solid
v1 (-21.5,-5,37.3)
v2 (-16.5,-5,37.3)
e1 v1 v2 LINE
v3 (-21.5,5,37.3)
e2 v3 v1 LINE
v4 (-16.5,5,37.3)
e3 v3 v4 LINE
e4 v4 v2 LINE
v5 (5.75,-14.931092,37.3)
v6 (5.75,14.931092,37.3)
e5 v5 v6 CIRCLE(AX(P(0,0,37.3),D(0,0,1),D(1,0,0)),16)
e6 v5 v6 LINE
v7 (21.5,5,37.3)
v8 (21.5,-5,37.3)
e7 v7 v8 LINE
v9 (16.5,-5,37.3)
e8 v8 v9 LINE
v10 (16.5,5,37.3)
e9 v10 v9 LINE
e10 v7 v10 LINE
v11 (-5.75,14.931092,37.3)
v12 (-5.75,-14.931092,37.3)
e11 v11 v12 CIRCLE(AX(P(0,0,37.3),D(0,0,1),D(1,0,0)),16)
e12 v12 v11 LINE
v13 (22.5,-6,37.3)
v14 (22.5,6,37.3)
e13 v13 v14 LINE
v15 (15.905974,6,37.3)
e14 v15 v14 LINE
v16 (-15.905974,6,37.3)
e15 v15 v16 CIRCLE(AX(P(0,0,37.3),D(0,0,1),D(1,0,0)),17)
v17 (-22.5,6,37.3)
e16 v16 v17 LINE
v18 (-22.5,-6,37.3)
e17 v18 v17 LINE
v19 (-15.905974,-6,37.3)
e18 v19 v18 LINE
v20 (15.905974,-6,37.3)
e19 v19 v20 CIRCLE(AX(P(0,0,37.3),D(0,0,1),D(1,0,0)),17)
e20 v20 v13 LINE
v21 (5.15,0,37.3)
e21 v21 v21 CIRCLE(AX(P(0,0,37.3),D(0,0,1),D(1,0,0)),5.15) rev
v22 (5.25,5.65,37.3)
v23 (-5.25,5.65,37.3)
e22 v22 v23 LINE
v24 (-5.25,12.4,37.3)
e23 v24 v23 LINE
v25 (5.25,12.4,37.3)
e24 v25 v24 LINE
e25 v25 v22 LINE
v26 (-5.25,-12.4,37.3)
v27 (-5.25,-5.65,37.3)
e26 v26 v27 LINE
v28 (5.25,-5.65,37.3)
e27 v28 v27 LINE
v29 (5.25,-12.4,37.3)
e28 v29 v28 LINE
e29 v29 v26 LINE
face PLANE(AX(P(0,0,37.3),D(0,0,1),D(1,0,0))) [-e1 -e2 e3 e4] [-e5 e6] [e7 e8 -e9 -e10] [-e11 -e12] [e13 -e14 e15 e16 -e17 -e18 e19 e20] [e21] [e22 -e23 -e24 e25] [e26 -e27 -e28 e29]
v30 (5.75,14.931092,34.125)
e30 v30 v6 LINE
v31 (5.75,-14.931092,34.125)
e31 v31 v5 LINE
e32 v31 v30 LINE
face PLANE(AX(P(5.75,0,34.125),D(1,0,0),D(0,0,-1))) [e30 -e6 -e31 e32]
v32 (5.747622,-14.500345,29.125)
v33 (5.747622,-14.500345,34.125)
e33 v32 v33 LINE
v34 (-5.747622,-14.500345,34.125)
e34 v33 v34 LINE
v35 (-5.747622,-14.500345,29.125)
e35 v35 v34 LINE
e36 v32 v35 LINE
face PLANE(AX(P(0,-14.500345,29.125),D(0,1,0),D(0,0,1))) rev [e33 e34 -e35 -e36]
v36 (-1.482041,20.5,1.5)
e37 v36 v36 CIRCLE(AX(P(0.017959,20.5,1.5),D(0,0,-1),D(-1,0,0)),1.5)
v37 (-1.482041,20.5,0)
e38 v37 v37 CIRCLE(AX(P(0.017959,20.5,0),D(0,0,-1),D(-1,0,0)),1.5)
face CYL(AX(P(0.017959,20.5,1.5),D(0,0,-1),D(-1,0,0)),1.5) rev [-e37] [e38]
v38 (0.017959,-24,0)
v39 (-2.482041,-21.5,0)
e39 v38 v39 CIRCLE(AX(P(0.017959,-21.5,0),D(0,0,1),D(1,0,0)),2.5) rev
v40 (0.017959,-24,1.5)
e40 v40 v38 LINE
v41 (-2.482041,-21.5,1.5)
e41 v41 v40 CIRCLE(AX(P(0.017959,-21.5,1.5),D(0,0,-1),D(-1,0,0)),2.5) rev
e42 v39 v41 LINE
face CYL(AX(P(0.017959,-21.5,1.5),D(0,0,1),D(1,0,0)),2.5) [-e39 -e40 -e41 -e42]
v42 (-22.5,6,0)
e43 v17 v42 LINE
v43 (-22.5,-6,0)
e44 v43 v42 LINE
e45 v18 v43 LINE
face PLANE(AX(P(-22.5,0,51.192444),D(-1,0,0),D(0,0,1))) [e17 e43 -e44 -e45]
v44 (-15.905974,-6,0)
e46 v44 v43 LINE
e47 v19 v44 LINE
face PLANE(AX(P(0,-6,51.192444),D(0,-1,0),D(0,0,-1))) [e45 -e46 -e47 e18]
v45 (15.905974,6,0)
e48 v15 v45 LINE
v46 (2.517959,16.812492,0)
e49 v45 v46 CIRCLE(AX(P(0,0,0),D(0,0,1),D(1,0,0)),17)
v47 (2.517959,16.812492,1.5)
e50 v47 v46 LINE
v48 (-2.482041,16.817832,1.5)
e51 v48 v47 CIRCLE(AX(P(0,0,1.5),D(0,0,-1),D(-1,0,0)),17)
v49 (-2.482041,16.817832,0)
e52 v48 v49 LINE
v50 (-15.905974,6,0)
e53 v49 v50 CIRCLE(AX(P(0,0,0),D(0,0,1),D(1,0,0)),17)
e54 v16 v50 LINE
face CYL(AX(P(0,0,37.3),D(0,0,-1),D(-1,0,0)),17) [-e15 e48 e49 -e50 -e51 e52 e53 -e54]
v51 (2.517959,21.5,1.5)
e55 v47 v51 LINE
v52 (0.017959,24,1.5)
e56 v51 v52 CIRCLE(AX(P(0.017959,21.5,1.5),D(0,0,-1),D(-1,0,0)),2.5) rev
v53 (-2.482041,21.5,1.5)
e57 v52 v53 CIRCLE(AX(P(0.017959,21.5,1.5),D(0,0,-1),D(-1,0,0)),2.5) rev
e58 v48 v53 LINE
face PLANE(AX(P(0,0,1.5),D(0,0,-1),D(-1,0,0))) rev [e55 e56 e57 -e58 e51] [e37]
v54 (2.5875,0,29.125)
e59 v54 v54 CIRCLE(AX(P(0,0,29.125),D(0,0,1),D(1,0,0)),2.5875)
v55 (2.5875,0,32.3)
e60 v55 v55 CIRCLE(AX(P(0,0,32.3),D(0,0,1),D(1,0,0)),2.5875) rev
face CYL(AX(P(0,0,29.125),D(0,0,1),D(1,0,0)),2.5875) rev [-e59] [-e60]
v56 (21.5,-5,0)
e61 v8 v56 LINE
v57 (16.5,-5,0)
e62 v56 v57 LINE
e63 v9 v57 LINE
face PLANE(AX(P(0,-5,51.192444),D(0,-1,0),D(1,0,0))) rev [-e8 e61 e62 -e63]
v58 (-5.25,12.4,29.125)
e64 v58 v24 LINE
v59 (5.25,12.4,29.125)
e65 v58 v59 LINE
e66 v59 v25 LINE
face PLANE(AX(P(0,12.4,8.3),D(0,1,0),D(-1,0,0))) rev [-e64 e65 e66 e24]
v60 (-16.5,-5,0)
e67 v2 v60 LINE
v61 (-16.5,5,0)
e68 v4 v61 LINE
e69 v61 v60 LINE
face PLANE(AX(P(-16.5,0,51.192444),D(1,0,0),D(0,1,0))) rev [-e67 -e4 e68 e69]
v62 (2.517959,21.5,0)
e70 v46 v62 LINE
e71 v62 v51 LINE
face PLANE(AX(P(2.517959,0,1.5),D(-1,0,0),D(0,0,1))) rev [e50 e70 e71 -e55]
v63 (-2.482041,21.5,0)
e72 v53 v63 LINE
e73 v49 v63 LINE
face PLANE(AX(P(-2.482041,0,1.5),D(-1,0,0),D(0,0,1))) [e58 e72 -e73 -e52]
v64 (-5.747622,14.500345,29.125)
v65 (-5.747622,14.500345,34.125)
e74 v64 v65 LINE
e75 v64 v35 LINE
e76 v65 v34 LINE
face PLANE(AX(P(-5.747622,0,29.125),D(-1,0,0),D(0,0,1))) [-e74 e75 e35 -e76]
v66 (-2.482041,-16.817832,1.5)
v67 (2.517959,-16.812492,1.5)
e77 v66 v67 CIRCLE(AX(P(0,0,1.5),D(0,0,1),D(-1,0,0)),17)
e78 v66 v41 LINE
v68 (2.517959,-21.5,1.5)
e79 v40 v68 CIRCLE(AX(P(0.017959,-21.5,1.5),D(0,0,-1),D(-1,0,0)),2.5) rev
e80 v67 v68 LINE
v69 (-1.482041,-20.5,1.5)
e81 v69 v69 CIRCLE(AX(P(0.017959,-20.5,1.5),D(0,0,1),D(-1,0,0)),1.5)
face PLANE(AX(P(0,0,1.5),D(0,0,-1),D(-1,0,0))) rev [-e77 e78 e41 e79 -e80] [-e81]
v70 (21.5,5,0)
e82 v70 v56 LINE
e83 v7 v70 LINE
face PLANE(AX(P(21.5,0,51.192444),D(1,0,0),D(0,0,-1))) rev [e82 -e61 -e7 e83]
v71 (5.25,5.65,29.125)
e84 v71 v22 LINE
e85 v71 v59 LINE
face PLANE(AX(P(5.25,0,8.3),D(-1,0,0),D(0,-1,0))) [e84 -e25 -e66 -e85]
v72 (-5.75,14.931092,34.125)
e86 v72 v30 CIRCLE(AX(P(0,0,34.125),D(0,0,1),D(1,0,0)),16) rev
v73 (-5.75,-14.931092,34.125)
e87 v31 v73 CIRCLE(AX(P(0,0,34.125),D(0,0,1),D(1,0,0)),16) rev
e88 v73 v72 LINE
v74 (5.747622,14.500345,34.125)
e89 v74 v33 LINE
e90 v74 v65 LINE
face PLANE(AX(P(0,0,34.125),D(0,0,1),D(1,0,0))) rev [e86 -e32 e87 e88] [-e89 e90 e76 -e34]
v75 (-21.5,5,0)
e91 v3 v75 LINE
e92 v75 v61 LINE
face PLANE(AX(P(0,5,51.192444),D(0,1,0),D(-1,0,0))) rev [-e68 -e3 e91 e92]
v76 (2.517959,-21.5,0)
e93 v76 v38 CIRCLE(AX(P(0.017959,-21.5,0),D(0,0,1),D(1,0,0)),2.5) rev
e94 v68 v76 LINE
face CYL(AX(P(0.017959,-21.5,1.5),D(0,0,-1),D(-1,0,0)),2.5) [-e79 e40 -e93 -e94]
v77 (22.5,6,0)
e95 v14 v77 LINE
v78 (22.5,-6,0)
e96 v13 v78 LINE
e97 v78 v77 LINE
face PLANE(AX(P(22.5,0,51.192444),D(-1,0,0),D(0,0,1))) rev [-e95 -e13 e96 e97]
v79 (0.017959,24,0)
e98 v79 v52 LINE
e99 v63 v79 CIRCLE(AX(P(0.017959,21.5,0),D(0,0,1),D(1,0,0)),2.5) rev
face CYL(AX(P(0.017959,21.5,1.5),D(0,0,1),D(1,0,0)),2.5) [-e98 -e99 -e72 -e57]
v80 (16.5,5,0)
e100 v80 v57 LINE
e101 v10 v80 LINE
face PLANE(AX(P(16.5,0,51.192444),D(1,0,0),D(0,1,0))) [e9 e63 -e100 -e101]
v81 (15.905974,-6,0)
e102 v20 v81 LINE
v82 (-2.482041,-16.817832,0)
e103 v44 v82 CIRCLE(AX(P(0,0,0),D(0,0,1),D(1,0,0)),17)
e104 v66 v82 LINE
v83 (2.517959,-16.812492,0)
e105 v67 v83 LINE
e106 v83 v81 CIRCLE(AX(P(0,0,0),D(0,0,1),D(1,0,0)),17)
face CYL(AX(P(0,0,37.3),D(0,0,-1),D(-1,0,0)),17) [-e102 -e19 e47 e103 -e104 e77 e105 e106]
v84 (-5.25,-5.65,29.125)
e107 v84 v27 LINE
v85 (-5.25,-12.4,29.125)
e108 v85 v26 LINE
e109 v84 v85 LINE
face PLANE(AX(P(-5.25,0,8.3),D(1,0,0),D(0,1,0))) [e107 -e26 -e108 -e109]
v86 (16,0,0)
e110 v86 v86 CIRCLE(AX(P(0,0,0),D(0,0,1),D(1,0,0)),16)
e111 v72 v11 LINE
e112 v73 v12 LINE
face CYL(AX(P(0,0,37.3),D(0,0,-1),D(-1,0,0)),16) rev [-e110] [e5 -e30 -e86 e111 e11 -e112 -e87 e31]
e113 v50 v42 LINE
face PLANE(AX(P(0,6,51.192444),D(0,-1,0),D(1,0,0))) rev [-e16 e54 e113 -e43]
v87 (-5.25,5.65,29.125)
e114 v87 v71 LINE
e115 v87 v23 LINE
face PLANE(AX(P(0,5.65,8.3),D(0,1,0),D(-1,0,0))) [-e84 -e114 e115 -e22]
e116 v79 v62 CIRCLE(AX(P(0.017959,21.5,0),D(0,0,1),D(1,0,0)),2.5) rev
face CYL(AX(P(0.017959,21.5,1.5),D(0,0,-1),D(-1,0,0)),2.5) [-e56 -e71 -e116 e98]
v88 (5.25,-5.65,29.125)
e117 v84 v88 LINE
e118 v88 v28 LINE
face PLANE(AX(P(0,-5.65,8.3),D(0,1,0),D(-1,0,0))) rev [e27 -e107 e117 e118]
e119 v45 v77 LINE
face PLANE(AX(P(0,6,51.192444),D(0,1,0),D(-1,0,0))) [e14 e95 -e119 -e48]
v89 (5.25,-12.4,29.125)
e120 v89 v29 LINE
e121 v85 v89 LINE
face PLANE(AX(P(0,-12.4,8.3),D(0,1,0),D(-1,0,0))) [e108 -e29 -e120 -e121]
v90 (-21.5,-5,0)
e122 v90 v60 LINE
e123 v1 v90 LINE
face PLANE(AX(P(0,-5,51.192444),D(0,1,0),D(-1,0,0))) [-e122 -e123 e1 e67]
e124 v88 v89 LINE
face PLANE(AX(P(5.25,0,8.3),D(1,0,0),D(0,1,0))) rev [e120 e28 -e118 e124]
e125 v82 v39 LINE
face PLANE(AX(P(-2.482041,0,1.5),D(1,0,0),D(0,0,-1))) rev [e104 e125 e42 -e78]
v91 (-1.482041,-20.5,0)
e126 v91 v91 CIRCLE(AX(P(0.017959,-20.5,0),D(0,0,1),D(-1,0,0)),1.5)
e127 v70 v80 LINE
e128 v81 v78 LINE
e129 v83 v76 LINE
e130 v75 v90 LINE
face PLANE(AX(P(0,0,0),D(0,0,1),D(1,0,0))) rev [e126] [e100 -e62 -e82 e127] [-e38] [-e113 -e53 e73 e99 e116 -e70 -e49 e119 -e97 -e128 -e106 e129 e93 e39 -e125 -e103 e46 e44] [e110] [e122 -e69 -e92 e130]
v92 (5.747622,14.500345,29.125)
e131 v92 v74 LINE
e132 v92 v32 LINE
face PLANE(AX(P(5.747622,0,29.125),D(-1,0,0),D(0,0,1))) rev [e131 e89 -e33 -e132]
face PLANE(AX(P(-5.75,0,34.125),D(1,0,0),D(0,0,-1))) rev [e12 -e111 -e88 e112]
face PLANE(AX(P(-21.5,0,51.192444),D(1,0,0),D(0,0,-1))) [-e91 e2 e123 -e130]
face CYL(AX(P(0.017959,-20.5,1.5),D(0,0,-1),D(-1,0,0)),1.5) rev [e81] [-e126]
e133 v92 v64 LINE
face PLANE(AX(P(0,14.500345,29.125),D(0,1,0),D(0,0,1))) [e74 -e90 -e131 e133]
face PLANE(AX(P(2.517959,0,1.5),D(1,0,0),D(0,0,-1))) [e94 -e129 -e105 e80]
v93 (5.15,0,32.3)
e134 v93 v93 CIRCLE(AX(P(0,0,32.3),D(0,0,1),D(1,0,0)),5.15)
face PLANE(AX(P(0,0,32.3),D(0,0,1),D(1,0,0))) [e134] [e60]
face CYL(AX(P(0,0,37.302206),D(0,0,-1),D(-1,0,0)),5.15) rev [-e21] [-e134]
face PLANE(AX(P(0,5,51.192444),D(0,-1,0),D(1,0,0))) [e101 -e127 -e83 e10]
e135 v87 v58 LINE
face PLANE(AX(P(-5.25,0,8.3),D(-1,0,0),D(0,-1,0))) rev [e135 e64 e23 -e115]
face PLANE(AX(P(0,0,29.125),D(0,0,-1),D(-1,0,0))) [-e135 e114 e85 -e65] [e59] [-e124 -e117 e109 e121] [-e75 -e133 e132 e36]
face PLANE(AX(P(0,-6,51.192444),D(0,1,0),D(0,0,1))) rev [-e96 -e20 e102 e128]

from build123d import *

# Parameters (mm, degrees)
SKETCH1_R               = 17
SKETCH1_R_2             = 16
BOSS_EXTRUDE1_DEPTH     = 37.3
BOSS_EXTRUDE3_START     = -3.175
SKETCH4_W               = 11.5
SKETCH4_H               = 11.5
BOSS_EXTRUDE3_DEPTH     = 3.175
SKETCH8_W               = 11.49524473
SKETCH8_H               = 29.000689646
SKETCH8_R               = 2.5875
BOSS_EXTRUDE4_DEPTH     = 5
CUT_EXTRUDE2_DEPTH      = 45.376683067
CUT_EXTRUDE2_DEPTH_BACK = 5
SKETCH7_R               = 5.15
SKETCH11_W              = 10.5
SKETCH11_H              = 6.75
CUT_EXTRUDE21_DEPTH     = 29
BOSS_EXTRUDE5_START     = -1.5
BOSS_EXTRUDE5_OUTLINE_R = 1.5
BOSS_EXTRUDE5_DEPTH     = 1.5
FILLET1_R               = 2.5
FILLET1_OF_MIRROR3_R    = 2.5
BOSS_EXTRUDE8_DEPTH     = 37.3
SKETCH15_8_W            = 5
SKETCH15_8_H            = 10
CUT_EXTRUDE22_DEPTH     = 37.3


# Read off the part's stored shape, not the designer's step: Boss-Extrude5
with BuildPart() as part:
    # Sketch1 → Boss-Extrude1 (new body)
    with BuildSketch(Plane.XY):
        with Locations(Location((0, 0, 0), (0, 0, 359.325928118))):
            Circle(SKETCH1_R)
        Circle(SKETCH1_R_2, mode=Mode.SUBTRACT)
    extrude(amount=BOSS_EXTRUDE1_DEPTH)

    # Sketch4 → Boss-Extrude3 (add)
    with BuildSketch(Plane.XY.offset(37.3).offset(BOSS_EXTRUDE3_START)):
        with BuildLine():
            ThreePointArc((-5.75, -14.931091722), (0, -16), (5.75, -14.931091722))
            Line((5.75, -14.931091722), (5.75, -5.75))
            Line((5.75, -5.75), (-5.75, -5.75))
            Line((-5.75, -5.75), (-5.75, -14.931091722))
        make_face()
        Rectangle(SKETCH4_W, SKETCH4_H)
        with BuildLine():
            ThreePointArc((5.75, 14.931091722), (0, 16), (-5.75, 14.931091722))
            Line((-5.75, 14.931091722), (-5.75, 5.75))
            Line((-5.75, 5.75), (5.75, 5.75))
            Line((5.75, 5.75), (5.75, 14.931091722))
        make_face()
    extrude(amount=BOSS_EXTRUDE3_DEPTH)

    # Sketch8 → Boss-Extrude4 (add)
    with BuildSketch(Plane.XY.offset(34.125)):
        Rectangle(SKETCH8_W, SKETCH8_H)
        Circle(SKETCH8_R, mode=Mode.SUBTRACT)
    extrude(amount=-BOSS_EXTRUDE4_DEPTH)

    # Sketch7 → Cut-Extrude2 (cut, two sides: drawn at the far end of the back side and taken through both)
    with BuildSketch(Plane.XY.offset(37.3).offset(-CUT_EXTRUDE2_DEPTH_BACK)):
        Circle(SKETCH7_R)
    extrude(amount=CUT_EXTRUDE2_DEPTH + CUT_EXTRUDE2_DEPTH_BACK, mode=Mode.SUBTRACT)

    # Sketch11 → Cut-Extrude21 (cut)
    with BuildSketch(Plane(origin=(0, 0, 37.3), x_dir=(-1, 0, 0), z_dir=(0, 0, -1))):
        with Locations((0, 9.025)):
            Rectangle(SKETCH11_W, SKETCH11_H)
    cut_extrude21 = extrude(amount=CUT_EXTRUDE21_DEPTH, mode=Mode.SUBTRACT)

    # Mirror1: Cut-Extrude21 across plane
    add(cut_extrude21.mirror(Plane.ZX), mode=Mode.SUBTRACT)

    # Boss-Extrude5 outline → Boss-Extrude5 (add)
    with BuildSketch(Plane(origin=(0, 0, 0), x_dir=(-1, 0, 0), z_dir=(0, 0, -1)).offset(BOSS_EXTRUDE5_START)):
        with BuildLine():
            ThreePointArc((-2.517959329, 16.812491809), (-0.018156734, 16.999990304), (2.482040671, 16.817832028))
            Line((2.482040671, 16.817832028), (2.482040671, 24))
            Line((2.482040671, 24), (-2.517959329, 24))
            Line((-2.517959329, 24), (-2.517959329, 16.812491809))
        make_face()
        with Locations((-0.017959329, 20.5)):
            Circle(BOSS_EXTRUDE5_OUTLINE_R, mode=Mode.SUBTRACT)
    boss_extrude5 = extrude(amount=BOSS_EXTRUDE5_DEPTH)

    # Fillet1
    fillet1_edges = [part.edges().sort_by_distance(p)[0] for p in [
        (2.517959329, 24, 0.75),
        (-2.482040671, 24, 0.75),
    ]]
    fillet(fillet1_edges, radius=FILLET1_R - 0.0001)  # a hair under: the kernel refuses the full size

    # Mirror3: Boss-Extrude5 across plane
    add(boss_extrude5.mirror(Plane.ZX))

    # Fillet1 of Mirror3
    fillet1_of_mirror3_edges = [part.edges().sort_by_distance(p)[0] for p in [
        (2.517959329, -24, 0.75),
        (-2.482040671, -24, 0.75),
    ]]
    fillet(fillet1_of_mirror3_edges, radius=FILLET1_OF_MIRROR3_R - 0.0001)  # a hair under: the kernel refuses the full size

    # Sketch15 → Boss-Extrude8 (add)
    with BuildSketch(Plane.XY):
        with BuildLine():
            Line((16.5, 5), (19, 5))
            Line((19, 5), (19, 6))
            Line((19, 6), (15.5, 6))
            Line((15.5, 6), (15.5, 3.968626967))
            ThreePointArc((15.5, 3.968626967), (15.874507866, 2), (16, 0))
            Line((16, 0), (16.5, 0))
            Line((16.5, 0), (16.5, 5))
        make_face()
        Polygon((21.5, 5), (21.5, 0), (22.5, 0), (22.5, 6), (19, 6), (19, 5), align=None)
        with BuildLine():
            Line((22.5, 0), (21.5, 0))
            Line((21.5, 0), (21.5, -5))
            Line((21.5, -5), (16.5, -5))
            Line((16.5, -5), (16.5, 0))
            Line((16.5, 0), (16, 0))
            ThreePointArc((16, 0), (15.874507866, -2), (15.5, -3.968626967))
            Line((15.5, -3.968626967), (15.5, -6))
            Line((15.5, -6), (22.5, -6))
            Line((22.5, -6), (22.5, 0))
        make_face()
    boss_extrude8 = extrude(amount=BOSS_EXTRUDE8_DEPTH)

    # Sketch15<8> → Cut-Extrude22 (cut)
    with BuildSketch(Plane.XY):
        with Locations((19, 0)):
            Rectangle(SKETCH15_8_W, SKETCH15_8_H)
    cut_extrude22 = extrude(amount=CUT_EXTRUDE22_DEPTH, mode=Mode.SUBTRACT)

    # Mirror4: Boss-Extrude8, Cut-Extrude22 across plane
    add(boss_extrude8.mirror(Plane(origin=(0, 0, 0), x_dir=(0, 0, 1), z_dir=(1, 0, 0))))
    add(cut_extrude22.mirror(Plane(origin=(0, 0, 0), x_dir=(0, 0, 1), z_dir=(1, 0, 0))), mode=Mode.SUBTRACT)


solid = part.part
